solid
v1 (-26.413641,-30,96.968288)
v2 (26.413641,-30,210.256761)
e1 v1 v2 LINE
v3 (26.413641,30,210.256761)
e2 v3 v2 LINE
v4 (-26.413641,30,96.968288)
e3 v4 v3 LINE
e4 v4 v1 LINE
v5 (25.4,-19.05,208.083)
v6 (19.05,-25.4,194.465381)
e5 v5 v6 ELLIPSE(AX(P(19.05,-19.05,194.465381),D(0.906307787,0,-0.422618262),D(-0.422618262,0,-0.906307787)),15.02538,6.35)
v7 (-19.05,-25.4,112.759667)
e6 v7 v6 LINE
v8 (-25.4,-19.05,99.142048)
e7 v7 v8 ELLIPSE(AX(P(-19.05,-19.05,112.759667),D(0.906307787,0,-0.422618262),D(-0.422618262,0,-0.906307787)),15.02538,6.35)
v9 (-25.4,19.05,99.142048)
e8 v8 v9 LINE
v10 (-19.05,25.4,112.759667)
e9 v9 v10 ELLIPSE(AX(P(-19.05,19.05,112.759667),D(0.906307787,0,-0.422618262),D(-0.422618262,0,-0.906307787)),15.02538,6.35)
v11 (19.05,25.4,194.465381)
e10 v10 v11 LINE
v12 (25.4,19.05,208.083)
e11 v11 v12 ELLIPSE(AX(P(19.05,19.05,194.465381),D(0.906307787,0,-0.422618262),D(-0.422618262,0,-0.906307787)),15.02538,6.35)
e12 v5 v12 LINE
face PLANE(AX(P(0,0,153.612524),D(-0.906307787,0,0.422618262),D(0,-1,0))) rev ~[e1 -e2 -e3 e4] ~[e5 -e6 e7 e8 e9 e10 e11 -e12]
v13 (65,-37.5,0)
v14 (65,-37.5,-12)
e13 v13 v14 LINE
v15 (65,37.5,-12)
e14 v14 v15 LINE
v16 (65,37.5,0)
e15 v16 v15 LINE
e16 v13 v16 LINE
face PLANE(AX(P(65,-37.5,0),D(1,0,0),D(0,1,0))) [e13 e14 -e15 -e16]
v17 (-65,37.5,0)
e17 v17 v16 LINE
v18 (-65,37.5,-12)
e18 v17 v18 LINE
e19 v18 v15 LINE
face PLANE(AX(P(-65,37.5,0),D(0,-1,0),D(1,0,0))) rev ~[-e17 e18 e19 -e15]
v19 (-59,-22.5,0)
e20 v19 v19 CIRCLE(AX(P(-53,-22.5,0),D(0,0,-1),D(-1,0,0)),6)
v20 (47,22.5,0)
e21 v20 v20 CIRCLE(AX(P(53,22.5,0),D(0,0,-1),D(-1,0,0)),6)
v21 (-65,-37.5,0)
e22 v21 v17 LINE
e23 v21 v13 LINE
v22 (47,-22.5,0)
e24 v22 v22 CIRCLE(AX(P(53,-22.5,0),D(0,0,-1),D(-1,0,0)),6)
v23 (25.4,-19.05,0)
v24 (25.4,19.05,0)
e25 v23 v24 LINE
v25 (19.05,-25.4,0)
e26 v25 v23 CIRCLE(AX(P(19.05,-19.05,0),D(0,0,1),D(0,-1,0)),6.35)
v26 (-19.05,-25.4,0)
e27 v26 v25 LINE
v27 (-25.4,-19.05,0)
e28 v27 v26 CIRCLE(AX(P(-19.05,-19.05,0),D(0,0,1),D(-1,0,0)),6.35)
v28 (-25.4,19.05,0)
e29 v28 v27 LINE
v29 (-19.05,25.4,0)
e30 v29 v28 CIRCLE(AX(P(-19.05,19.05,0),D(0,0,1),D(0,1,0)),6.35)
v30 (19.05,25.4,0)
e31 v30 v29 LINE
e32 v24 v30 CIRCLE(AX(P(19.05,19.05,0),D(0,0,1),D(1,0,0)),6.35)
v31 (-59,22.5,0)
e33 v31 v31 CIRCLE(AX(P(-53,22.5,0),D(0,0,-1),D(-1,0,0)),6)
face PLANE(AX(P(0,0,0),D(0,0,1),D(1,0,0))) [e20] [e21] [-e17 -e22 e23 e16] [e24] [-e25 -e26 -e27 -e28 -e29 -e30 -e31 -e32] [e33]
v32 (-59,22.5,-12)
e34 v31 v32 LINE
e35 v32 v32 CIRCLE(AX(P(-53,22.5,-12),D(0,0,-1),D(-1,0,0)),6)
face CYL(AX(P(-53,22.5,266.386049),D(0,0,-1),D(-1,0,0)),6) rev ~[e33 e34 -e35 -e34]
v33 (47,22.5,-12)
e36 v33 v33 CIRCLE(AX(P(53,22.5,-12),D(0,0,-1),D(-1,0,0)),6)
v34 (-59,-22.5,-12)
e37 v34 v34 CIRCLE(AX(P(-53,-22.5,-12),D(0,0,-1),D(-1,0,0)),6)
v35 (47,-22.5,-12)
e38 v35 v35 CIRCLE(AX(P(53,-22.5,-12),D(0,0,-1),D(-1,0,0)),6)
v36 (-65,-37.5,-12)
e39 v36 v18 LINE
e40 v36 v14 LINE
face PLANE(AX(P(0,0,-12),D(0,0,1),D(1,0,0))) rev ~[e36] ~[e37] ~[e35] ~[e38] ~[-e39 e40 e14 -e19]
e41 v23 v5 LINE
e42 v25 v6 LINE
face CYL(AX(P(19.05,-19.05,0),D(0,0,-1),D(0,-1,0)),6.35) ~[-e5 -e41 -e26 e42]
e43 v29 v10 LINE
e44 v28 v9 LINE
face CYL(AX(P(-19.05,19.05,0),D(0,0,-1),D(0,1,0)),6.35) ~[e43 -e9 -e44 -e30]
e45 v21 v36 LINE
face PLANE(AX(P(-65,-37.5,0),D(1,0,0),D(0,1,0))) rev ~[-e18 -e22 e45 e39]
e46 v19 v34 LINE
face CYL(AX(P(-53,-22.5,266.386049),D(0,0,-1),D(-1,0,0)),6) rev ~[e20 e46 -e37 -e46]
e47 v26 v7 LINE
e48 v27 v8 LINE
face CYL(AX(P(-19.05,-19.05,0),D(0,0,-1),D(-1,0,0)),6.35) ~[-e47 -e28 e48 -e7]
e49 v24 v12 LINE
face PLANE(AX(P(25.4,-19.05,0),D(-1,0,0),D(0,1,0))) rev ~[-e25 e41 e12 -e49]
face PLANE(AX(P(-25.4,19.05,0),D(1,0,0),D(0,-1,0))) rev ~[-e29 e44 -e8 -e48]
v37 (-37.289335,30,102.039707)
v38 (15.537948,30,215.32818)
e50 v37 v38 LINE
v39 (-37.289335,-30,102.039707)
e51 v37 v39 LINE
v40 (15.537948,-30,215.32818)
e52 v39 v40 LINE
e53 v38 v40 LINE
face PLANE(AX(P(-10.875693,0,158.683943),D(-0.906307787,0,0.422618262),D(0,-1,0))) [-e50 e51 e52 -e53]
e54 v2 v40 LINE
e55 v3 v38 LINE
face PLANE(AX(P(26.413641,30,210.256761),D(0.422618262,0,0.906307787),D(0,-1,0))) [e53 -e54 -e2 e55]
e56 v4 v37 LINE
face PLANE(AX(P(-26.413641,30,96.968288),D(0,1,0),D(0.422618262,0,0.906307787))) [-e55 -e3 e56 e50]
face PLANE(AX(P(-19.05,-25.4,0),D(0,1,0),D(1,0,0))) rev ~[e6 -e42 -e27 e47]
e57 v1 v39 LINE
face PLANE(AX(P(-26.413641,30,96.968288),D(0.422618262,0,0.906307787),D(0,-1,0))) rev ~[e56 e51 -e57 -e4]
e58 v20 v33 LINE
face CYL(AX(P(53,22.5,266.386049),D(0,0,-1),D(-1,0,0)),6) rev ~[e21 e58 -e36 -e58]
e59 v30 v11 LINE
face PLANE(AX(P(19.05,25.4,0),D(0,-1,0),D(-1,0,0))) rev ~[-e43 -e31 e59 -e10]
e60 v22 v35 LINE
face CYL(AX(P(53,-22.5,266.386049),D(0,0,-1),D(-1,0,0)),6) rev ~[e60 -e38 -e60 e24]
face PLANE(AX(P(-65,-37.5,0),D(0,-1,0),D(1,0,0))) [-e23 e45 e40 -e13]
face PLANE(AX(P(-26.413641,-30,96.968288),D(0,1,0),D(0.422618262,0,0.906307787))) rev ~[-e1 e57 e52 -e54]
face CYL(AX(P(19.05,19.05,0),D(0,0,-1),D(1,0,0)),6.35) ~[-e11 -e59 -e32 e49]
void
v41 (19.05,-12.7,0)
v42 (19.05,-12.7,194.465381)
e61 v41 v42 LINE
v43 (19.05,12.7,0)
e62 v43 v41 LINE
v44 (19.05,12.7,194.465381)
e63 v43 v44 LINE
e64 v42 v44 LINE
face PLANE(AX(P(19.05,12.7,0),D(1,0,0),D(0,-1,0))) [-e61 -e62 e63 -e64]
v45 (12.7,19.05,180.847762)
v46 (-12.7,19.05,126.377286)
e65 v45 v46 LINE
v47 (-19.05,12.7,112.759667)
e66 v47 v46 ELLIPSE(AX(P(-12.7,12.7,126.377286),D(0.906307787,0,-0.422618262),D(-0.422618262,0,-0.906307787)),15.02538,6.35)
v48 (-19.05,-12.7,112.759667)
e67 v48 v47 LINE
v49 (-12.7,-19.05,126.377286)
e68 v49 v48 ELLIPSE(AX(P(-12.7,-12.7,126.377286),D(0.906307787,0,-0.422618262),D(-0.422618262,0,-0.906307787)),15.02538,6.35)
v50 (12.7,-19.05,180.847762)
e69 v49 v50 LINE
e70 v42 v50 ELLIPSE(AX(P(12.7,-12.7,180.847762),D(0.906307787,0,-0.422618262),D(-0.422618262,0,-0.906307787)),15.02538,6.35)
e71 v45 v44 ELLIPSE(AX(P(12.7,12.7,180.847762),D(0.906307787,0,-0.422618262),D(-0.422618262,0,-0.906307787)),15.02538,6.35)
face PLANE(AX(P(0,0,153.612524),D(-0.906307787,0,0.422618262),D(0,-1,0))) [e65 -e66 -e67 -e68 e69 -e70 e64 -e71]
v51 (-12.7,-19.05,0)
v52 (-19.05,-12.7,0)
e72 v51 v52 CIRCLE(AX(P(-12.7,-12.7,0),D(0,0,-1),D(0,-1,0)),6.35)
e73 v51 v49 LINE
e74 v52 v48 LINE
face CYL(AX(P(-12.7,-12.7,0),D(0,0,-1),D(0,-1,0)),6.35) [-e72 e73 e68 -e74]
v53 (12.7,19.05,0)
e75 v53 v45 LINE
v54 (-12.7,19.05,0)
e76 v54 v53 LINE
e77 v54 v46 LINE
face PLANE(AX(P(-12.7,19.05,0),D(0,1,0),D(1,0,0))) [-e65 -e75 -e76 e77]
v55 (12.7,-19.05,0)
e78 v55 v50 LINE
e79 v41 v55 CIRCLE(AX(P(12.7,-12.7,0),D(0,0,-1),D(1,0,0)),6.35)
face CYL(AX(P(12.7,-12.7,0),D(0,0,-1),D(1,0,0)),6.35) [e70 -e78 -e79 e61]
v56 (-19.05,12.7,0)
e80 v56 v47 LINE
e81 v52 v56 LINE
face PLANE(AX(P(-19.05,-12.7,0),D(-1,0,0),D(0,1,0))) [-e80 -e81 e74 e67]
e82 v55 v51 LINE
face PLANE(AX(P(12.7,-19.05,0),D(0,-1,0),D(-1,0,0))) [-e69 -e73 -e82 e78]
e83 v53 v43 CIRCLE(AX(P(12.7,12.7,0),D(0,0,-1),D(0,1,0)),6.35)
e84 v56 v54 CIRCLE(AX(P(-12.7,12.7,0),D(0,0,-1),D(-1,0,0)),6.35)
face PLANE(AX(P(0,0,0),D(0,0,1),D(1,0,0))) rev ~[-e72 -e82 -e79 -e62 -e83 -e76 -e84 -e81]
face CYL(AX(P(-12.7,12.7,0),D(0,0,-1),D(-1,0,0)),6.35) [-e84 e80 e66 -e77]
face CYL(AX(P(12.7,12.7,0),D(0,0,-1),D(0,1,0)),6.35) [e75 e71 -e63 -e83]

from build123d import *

# Parameters (mm, degrees)
F0_W     = 130
F0_H     = 75
F1_DEPTH = 12
F3_DEPTH = 208.083
F5_D     = 12
F7_DEPTH = 50.8
F8_W     = 60
F8_H     = 125
F9_DEPTH = 12


with BuildPart() as f1:
    # F0 (on Top) → F1 (new body)
    with BuildSketch(Plane.XY):
        Rectangle(F0_W, F0_H)
    extrude(amount=-F1_DEPTH)

    # F2 (on face) → F3 (join)
    with BuildSketch(Plane.XY):
        with BuildLine():
            Line((-19.05, -25.4), (19.05, -25.4))
            ThreePointArc((19.05, -25.4), (23.5401280605, -23.5401280605), (25.4, -19.05))
            Line((25.4, -19.05), (25.4, 19.05))
            ThreePointArc((25.4, 19.05), (23.5401280605, 23.5401280605), (19.05, 25.4))
            Line((19.05, 25.4), (-19.05, 25.4))
            ThreePointArc((-19.05, 25.4), (-23.5401280605, 23.5401280605), (-25.4, 19.05))
            Line((-25.4, 19.05), (-25.4, -19.05))
            ThreePointArc((-25.4, -19.05), (-23.5401280605, -23.5401280605), (-19.05, -25.4))
        make_face()
        with BuildLine():
            Line((-12.7, 19.05), (12.7, 19.05))
            ThreePointArc((12.7, 19.05), (17.1901280605, 17.1901280605), (19.05, 12.7))
            Line((19.05, 12.7), (19.05, -12.7))
            ThreePointArc((19.05, -12.7), (17.1901280605, -17.1901280605), (12.7, -19.05))
            Line((12.7, -19.05), (-12.7, -19.05))
            ThreePointArc((-12.7, -19.05), (-17.1901280605, -17.1901280605), (-19.05, -12.7))
            Line((-19.05, -12.7), (-19.05, 12.7))
            ThreePointArc((-19.05, 12.7), (-17.1901280605, 17.1901280605), (-12.7, 19.05))
        make_face(mode=Mode.SUBTRACT)
    extrude(amount=F3_DEPTH)

    # F5 (through all)
    with Locations(Plane.XY):
        with Locations((-53, 22.5), (53, 22.5), (53, -22.5), (-53, -22.5)):
            Hole(F5_D / 2)

    # F6 (on face) → F7 (cut)
    with BuildSketch(Plane.XZ.offset(25.4)):
        Polygon((19.05, 208.083), (-19.05, 208.083), (-19.05, 112.7596673834), (19.05, 194.4653810548), align=None)
        Polygon((25.4, 208.083), (19.05, 208.083), (19.05, 194.4653810548), align=None)
        Polygon((-19.05, 112.7596673834), (-19.05, 208.083), (-25.4, 208.083), (-25.4, 99.1420484381), align=None)
    extrude(amount=-F7_DEPTH, mode=Mode.SUBTRACT)

    # F8 (on face) → F9 (join)
    with BuildSketch(Plane(origin=(-58.8370102857, 0, 27.4361484792), x_dir=(0, -1, 0), z_dir=(-0.906307787, 0, 0.4226182617))):
        with Locations((0, 139.2202268861)):
            Rectangle(F8_W, F8_H)
        with BuildLine():
            Line((25.4, 184.2963670451), (25.4, 94.144086727))
            add(Edge.make_bspline(
                [(25.4, 94.144086727), (25.4, 79.118706674), (19.05, 79.118706674)],
                knots=[4.7123889804, 4.7123889804, 4.7123889804, 6.2831853072, 6.2831853072, 6.2831853072], degree=2, weights=[1, 0.7071067812, 1]))
            Line((19.05, 79.118706674), (-19.05, 79.118706674))
            add(Edge.make_bspline(
                [(-19.05, 79.118706674), (-25.4, 79.118706674), (-25.4, 94.144086727)],
                knots=[0, 0, 0, 1.5707963268, 1.5707963268, 1.5707963268], degree=2, weights=[1, 0.7071067812, 1]))
            Line((-25.4, 94.144086727), (-25.4, 184.2963670451))
            add(Edge.make_bspline(
                [(-25.4, 184.2963670451), (-25.4, 199.3217470982), (-19.05, 199.3217470982)],
                knots=[1.5707963268, 1.5707963268, 1.5707963268, 3.1415926536, 3.1415926536, 3.1415926536], degree=2, weights=[1, 0.7071067812, 1]))
            Line((-19.05, 199.3217470982), (19.05, 199.3217470982))
            add(Edge.make_bspline(
                [(19.05, 199.3217470982), (25.4, 199.3217470982), (25.4, 184.2963670451)],
                knots=[3.1415926536, 3.1415926536, 3.1415926536, 4.7123889804, 4.7123889804, 4.7123889804], degree=2, weights=[1, 0.7071067812, 1]))
        make_face(mode=Mode.SUBTRACT)
        with BuildLine():
            add(Edge.make_bspline(
                [(25.4, 94.144086727), (25.4, 79.118706674), (19.05, 79.118706674)],
                knots=[4.7123889804, 4.7123889804, 4.7123889804, 6.2831853072, 6.2831853072, 6.2831853072], degree=2, weights=[1, 0.7071067812, 1]))
            Line((25.4, 94.144086727), (25.4, 184.2963670451))
            add(Edge.make_bspline(
                [(19.05, 199.3217470982), (25.4, 199.3217470982), (25.4, 184.2963670451)],
                knots=[3.1415926536, 3.1415926536, 3.1415926536, 4.7123889804, 4.7123889804, 4.7123889804], degree=2, weights=[1, 0.7071067812, 1]))
            Line((19.05, 199.3217470982), (-19.05, 199.3217470982))
            add(Edge.make_bspline(
                [(-25.4, 184.2963670451), (-25.4, 199.3217470982), (-19.05, 199.3217470982)],
                knots=[1.5707963268, 1.5707963268, 1.5707963268, 3.1415926536, 3.1415926536, 3.1415926536], degree=2, weights=[1, 0.7071067812, 1]))
            Line((-25.4, 184.2963670451), (-25.4, 94.144086727))
            add(Edge.make_bspline(
                [(-19.05, 79.118706674), (-25.4, 79.118706674), (-25.4, 94.144086727)],
                knots=[0, 0, 0, 1.5707963268, 1.5707963268, 1.5707963268], degree=2, weights=[1, 0.7071067812, 1]))
            Line((-19.05, 79.118706674), (19.05, 79.118706674))
        make_face()
        with BuildLine():
            Line((12.7, 94.144086727), (-12.7, 94.144086727))
            add(Edge.make_bspline(
                [(-12.7, 94.144086727), (-19.05, 94.144086727), (-19.05, 109.1694667801)],
                knots=[0, 0, 0, 1.5707963268, 1.5707963268, 1.5707963268], degree=2, weights=[1, 0.7071067812, 1]))
            Line((-19.05, 109.1694667801), (-19.05, 169.2709869921))
            add(Edge.make_bspline(
                [(-19.05, 169.2709869921), (-19.05, 184.2963670451), (-12.7, 184.2963670451)],
                knots=[1.5707963268, 1.5707963268, 1.5707963268, 3.1415926536, 3.1415926536, 3.1415926536], degree=2, weights=[1, 0.7071067812, 1]))
            Line((-12.7, 184.2963670451), (12.7, 184.2963670451))
            add(Edge.make_bspline(
                [(12.7, 184.2963670451), (19.05, 184.2963670451), (19.05, 169.2709869921)],
                knots=[3.1415926536, 3.1415926536, 3.1415926536, 4.7123889804, 4.7123889804, 4.7123889804], degree=2, weights=[1, 0.7071067812, 1]))
            Line((19.05, 169.2709869921), (19.05, 109.1694667801))
            add(Edge.make_bspline(
                [(19.05, 109.1694667801), (19.05, 94.144086727), (12.7, 94.144086727)],
                knots=[4.7123889804, 4.7123889804, 4.7123889804, 6.2831853072, 6.2831853072, 6.2831853072], degree=2, weights=[1, 0.7071067812, 1]))
        make_face(mode=Mode.SUBTRACT)
        with BuildLine():
            add(Edge.make_bspline(
                [(-12.7, 94.144086727), (-19.05, 94.144086727), (-19.05, 109.1694667801)],
                knots=[0, 0, 0, 1.5707963268, 1.5707963268, 1.5707963268], degree=2, weights=[1, 0.7071067812, 1]))
            Line((-12.7, 94.144086727), (12.7, 94.144086727))
            add(Edge.make_bspline(
                [(19.05, 109.1694667801), (19.05, 94.144086727), (12.7, 94.144086727)],
                knots=[4.7123889804, 4.7123889804, 4.7123889804, 6.2831853072, 6.2831853072, 6.2831853072], degree=2, weights=[1, 0.7071067812, 1]))
            Line((19.05, 109.1694667801), (19.05, 169.2709869921))
            add(Edge.make_bspline(
                [(12.7, 184.2963670451), (19.05, 184.2963670451), (19.05, 169.2709869921)],
                knots=[3.1415926536, 3.1415926536, 3.1415926536, 4.7123889804, 4.7123889804, 4.7123889804], degree=2, weights=[1, 0.7071067812, 1]))
            Line((12.7, 184.2963670451), (-12.7, 184.2963670451))
            add(Edge.make_bspline(
                [(-19.05, 169.2709869921), (-19.05, 184.2963670451), (-12.7, 184.2963670451)],
                knots=[1.5707963268, 1.5707963268, 1.5707963268, 3.1415926536, 3.1415926536, 3.1415926536], degree=2, weights=[1, 0.7071067812, 1]))
            Line((-19.05, 169.2709869921), (-19.05, 109.1694667801))
        make_face()
    extrude(amount=F9_DEPTH)


solid = f1.part
